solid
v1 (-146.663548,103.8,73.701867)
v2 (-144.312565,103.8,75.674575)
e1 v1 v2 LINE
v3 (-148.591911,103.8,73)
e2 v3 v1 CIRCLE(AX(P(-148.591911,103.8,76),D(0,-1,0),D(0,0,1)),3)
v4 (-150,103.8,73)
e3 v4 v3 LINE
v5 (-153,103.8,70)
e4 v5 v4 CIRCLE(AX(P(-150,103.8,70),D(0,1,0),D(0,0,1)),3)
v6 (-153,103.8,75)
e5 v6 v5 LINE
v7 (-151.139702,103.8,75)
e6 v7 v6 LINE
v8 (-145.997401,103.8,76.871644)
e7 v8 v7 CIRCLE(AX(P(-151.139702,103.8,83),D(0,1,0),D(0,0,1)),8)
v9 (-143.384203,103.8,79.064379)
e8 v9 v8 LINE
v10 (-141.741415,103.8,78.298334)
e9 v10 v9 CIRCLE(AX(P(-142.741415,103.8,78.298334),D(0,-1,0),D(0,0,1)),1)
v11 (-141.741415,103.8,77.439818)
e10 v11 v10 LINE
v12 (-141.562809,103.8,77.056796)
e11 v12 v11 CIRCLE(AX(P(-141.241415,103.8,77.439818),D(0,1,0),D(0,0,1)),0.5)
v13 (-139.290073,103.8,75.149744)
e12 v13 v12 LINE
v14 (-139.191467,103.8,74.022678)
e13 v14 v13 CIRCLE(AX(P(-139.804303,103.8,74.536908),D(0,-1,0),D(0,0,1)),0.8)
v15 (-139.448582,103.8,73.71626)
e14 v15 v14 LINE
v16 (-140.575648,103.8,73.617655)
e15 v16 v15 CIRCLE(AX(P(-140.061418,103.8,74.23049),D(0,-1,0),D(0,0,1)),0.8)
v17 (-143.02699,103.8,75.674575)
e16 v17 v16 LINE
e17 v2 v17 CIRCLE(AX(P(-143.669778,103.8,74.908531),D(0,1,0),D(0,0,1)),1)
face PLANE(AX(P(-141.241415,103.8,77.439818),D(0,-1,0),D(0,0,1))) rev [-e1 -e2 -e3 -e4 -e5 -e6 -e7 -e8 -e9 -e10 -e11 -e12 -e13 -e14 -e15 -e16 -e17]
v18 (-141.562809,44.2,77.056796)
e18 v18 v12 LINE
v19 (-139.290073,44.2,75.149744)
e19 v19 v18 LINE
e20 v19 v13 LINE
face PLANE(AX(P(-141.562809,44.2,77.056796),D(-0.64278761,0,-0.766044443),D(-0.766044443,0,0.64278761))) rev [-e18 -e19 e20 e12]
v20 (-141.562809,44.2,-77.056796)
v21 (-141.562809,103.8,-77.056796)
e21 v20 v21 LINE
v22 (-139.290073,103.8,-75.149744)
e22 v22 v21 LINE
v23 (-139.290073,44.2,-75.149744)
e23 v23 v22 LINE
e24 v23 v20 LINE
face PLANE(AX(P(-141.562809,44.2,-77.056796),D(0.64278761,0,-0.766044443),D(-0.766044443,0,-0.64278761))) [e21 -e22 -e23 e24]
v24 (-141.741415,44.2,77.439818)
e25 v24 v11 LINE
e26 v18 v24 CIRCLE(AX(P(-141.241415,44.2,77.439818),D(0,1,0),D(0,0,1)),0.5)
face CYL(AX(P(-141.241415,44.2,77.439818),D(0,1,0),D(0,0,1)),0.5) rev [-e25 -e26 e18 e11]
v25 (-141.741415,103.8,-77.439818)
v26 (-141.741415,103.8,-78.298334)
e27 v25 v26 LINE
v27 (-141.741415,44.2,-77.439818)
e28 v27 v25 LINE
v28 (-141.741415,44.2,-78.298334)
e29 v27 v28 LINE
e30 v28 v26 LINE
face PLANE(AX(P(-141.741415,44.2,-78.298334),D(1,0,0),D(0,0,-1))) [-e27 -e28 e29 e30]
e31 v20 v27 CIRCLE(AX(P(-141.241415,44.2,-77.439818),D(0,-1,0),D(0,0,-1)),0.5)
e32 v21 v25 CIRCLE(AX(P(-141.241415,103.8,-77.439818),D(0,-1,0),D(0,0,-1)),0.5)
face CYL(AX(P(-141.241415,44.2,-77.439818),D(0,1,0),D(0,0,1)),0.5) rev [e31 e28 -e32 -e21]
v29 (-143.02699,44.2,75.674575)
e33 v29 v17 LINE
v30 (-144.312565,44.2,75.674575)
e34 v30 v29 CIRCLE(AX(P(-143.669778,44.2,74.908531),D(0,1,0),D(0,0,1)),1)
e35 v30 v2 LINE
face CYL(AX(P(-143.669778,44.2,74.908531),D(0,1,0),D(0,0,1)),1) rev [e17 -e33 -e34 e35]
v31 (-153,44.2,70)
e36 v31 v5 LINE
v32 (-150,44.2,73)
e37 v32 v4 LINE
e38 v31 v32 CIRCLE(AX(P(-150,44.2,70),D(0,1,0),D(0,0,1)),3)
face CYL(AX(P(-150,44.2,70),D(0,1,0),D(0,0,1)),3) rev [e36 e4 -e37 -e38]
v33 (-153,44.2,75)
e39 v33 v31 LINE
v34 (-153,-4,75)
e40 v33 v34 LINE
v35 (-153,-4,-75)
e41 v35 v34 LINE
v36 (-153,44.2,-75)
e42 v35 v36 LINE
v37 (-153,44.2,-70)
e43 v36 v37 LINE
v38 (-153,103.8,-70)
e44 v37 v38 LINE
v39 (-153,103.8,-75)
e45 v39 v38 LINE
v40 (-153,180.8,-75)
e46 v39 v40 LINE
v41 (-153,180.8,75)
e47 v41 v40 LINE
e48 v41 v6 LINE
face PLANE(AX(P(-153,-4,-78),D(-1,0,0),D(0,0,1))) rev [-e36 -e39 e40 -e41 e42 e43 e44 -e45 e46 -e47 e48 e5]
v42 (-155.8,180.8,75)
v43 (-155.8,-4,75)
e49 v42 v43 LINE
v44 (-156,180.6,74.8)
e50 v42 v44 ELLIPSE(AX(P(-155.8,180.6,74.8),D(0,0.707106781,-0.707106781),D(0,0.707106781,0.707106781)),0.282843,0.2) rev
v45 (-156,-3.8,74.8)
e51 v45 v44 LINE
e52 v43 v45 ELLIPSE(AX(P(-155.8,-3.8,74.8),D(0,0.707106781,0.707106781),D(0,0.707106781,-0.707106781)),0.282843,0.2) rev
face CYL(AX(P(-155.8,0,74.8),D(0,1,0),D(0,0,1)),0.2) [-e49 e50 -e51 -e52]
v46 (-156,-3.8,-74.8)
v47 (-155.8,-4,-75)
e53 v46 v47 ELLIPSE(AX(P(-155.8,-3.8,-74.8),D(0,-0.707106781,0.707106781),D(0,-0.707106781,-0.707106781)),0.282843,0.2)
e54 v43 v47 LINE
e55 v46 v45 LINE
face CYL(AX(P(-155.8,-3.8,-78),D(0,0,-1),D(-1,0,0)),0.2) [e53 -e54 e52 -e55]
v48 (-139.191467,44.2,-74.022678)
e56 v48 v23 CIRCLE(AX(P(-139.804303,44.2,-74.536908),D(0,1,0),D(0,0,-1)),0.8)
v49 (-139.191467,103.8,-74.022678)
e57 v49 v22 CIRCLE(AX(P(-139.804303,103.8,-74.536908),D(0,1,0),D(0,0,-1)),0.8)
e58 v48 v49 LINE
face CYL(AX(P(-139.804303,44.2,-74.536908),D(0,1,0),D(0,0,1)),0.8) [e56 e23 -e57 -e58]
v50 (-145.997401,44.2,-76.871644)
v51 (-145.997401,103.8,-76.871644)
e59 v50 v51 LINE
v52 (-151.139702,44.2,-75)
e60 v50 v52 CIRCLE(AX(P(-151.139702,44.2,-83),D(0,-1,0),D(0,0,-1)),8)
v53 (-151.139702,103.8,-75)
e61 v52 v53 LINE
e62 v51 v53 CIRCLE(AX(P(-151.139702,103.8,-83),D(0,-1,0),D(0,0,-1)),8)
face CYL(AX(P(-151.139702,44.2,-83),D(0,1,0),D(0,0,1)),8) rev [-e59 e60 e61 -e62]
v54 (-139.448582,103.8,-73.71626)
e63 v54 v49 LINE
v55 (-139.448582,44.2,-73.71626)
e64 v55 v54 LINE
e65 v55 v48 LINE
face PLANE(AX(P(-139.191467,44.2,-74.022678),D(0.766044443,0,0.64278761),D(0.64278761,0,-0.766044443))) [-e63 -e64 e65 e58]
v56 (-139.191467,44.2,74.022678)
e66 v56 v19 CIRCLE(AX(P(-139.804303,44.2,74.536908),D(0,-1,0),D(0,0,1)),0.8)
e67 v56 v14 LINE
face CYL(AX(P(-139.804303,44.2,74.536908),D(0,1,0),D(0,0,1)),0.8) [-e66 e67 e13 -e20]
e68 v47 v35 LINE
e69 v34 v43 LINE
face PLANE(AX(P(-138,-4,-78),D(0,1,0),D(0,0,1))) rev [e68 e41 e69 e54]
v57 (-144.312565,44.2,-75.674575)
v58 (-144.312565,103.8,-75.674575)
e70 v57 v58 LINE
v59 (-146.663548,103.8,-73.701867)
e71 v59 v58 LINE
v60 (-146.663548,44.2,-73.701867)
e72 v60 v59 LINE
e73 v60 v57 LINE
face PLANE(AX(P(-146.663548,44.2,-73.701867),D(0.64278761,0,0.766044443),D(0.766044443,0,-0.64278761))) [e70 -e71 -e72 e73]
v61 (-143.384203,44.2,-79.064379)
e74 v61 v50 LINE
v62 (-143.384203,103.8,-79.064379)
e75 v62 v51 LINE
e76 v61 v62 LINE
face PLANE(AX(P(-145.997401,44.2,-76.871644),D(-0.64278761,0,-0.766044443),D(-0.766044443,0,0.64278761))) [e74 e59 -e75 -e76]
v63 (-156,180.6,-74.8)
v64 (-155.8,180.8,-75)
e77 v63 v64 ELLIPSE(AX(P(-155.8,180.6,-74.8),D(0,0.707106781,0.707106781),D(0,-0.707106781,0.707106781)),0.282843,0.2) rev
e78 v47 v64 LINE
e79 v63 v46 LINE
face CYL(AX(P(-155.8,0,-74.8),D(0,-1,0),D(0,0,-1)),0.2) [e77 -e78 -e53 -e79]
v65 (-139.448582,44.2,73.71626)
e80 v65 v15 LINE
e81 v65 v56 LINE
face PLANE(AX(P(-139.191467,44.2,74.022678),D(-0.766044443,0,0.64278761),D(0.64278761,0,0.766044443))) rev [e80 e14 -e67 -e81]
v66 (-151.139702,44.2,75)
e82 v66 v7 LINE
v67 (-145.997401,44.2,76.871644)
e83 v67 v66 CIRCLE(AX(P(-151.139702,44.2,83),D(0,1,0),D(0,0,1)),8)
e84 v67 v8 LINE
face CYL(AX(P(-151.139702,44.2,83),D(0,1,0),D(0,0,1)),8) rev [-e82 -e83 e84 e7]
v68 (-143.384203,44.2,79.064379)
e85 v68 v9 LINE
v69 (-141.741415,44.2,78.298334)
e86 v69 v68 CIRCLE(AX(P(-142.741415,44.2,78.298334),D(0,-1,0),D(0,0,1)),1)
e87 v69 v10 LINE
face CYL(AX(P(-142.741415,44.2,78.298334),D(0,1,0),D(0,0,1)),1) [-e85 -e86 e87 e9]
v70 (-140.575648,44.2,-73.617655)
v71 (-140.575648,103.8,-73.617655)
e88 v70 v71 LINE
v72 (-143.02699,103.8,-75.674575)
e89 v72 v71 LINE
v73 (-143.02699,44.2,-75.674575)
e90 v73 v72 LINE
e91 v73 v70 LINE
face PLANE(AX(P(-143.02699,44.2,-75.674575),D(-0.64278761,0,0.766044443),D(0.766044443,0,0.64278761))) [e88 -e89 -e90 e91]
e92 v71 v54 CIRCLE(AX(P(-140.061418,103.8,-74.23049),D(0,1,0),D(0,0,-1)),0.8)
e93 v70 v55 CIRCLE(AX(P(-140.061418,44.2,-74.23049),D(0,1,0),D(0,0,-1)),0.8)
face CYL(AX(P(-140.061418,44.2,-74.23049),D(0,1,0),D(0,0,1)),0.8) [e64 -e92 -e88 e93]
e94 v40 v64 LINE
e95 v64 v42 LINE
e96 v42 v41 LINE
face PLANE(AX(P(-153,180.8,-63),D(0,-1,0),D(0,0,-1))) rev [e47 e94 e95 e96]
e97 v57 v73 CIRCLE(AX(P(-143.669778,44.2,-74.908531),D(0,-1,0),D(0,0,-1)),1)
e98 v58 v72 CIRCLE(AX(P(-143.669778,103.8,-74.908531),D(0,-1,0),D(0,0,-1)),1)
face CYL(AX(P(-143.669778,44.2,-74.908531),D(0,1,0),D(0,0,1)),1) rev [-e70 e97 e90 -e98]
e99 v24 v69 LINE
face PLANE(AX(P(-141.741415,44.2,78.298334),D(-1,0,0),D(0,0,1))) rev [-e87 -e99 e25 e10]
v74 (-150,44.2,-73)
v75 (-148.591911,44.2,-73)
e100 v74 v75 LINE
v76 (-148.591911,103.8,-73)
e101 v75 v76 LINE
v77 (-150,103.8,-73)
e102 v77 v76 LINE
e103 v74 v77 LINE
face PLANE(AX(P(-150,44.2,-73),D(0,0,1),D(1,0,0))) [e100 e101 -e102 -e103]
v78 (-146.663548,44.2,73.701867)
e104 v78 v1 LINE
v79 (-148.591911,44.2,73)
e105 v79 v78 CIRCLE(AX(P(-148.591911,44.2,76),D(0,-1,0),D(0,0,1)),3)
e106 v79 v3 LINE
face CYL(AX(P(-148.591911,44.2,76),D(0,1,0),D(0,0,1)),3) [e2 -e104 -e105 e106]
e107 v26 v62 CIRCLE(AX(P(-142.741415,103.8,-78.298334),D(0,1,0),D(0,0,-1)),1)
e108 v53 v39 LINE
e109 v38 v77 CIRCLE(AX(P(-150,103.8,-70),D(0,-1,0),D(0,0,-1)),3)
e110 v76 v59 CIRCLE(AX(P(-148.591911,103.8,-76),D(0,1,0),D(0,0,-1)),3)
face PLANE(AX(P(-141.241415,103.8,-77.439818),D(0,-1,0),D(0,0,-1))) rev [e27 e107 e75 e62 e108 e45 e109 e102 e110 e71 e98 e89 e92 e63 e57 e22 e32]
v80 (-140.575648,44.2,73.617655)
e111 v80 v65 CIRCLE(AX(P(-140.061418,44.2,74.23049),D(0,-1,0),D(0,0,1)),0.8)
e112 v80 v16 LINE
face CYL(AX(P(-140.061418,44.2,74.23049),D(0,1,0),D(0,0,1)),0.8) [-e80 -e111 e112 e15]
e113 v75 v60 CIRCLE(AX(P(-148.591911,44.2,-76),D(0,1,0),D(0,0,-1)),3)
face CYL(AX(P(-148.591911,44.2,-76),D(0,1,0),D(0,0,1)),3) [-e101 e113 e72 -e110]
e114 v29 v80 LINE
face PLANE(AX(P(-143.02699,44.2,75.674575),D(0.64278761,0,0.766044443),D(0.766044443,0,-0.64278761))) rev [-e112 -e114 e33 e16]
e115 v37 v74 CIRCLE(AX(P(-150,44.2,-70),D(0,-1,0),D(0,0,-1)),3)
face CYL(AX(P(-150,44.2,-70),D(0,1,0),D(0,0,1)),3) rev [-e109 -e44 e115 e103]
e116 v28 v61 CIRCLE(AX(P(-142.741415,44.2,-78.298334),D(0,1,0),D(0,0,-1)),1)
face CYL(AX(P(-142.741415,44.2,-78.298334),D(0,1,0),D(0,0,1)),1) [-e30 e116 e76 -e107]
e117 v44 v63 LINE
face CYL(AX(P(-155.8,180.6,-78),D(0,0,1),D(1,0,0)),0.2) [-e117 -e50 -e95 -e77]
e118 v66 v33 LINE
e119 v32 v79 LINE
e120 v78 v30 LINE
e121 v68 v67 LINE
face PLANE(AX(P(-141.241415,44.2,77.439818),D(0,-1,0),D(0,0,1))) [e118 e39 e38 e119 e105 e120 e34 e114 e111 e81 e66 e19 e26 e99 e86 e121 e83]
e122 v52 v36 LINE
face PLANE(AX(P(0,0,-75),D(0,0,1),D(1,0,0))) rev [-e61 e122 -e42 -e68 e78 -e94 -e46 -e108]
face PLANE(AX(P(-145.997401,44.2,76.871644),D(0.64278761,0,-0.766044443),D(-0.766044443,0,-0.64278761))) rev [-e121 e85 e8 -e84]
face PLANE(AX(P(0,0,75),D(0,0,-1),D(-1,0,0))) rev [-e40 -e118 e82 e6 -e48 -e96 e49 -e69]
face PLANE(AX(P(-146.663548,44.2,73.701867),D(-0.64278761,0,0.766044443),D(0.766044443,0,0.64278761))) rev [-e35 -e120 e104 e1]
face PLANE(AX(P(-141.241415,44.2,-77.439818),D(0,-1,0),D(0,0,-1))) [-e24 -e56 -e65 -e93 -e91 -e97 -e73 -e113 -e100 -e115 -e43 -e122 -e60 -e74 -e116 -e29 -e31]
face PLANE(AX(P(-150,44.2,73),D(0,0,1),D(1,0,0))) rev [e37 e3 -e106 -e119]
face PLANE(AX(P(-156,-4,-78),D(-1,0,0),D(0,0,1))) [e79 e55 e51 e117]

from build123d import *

# Parameters (mm, degrees)
STOCK_OUTTER_CASE_1_START     = -75
STOCK_OUTTER_CASE_1_OUTLINE_W = 3
STOCK_OUTTER_CASE_1_OUTLINE_H = 184.8
STOCK_OUTTER_CASE_1_DEPTH     = 150
FILLET1_R                     = 0.2
BOSS_EXTRUDE1_DEPTH           = 29.8


# Read off the part's stored shape, not the designer's step: Stock-outter_case-1
with BuildPart() as part:
    # Stock-outter_case-1 outline → Stock-outter_case-1 (new body)
    with BuildSketch(Plane.XY.offset(STOCK_OUTTER_CASE_1_START)):
        with Locations((-154.5, 88.4)):
            Rectangle(STOCK_OUTTER_CASE_1_OUTLINE_W, STOCK_OUTTER_CASE_1_OUTLINE_H)
    extrude(amount=STOCK_OUTTER_CASE_1_DEPTH)

    # Fillet1
    fillet1_edges = [part.edges().sort_by_distance(p)[0] for p in [
        (-156, 180.8, 0),
        (-156, -4, 0),
        (-156, 88.4, 75),
        (-156, 88.4, -75),
    ]]
    fillet(fillet1_edges, radius=FILLET1_R)

    # Sketch1 → Boss-Extrude1 (add, symmetric)
    with BuildSketch(Plane(origin=(0, 74, 0), x_dir=(1, 0, 0), z_dir=(0, 1, 0))):
        with BuildLine():
            Line((-153, 75), (-151.139702343, 75))
            ThreePointArc((-151.139702343, 75), (-148.403541196, 75.482459034), (-145.997401465, 76.871644455))
            Line((-145.997401465, 76.871644455), (-143.384202565, 79.064378688))
            ThreePointArc((-143.384202565, 79.064378688), (-142.318796694, 79.204642032), (-141.741414955, 78.298334245))
            Line((-141.741414955, 78.298334245), (-141.741414955, 77.439817918))
            ThreePointArc((-141.741414955, 77.439817918), (-141.694568849, 77.228508787), (-141.56280876, 77.056795696))
            Line((-141.56280876, 77.056795696), (-139.290072737, 75.149743737))
            ThreePointArc((-139.290072737, 75.149743737), (-139.007347067, 74.606632777), (-139.191467271, 74.022678095))
            Line((-139.191467271, 74.022678095), (-139.448582314, 73.716260318))
            ThreePointArc((-139.448582314, 73.716260318), (-139.991693275, 73.433534647), (-140.575647957, 73.617654851))
            Line((-140.575647957, 73.617654851), (-143.026990175, 75.674575202))
            ThreePointArc((-143.026990175, 75.674575202), (-143.669777784, 75.908530759), (-144.312565394, 75.674575202))
            Line((-144.312565394, 75.674575202), (-146.663547874, 73.701866671))
            ThreePointArc((-146.663547874, 73.701866671), (-147.565850273, 73.180922138), (-148.591910703, 73))
            Line((-148.591910703, 73), (-150, 73))
            ThreePointArc((-150, 73), (-152.121320344, 72.121320344), (-153, 70))
            Line((-153, 70), (-153, 75))
        make_face()
    boss_extrude1 = extrude(amount=BOSS_EXTRUDE1_DEPTH, both=True)

    # Mirror1: Boss-Extrude1 across plane
    add(boss_extrude1.mirror(Plane.XY))


solid = part.part
